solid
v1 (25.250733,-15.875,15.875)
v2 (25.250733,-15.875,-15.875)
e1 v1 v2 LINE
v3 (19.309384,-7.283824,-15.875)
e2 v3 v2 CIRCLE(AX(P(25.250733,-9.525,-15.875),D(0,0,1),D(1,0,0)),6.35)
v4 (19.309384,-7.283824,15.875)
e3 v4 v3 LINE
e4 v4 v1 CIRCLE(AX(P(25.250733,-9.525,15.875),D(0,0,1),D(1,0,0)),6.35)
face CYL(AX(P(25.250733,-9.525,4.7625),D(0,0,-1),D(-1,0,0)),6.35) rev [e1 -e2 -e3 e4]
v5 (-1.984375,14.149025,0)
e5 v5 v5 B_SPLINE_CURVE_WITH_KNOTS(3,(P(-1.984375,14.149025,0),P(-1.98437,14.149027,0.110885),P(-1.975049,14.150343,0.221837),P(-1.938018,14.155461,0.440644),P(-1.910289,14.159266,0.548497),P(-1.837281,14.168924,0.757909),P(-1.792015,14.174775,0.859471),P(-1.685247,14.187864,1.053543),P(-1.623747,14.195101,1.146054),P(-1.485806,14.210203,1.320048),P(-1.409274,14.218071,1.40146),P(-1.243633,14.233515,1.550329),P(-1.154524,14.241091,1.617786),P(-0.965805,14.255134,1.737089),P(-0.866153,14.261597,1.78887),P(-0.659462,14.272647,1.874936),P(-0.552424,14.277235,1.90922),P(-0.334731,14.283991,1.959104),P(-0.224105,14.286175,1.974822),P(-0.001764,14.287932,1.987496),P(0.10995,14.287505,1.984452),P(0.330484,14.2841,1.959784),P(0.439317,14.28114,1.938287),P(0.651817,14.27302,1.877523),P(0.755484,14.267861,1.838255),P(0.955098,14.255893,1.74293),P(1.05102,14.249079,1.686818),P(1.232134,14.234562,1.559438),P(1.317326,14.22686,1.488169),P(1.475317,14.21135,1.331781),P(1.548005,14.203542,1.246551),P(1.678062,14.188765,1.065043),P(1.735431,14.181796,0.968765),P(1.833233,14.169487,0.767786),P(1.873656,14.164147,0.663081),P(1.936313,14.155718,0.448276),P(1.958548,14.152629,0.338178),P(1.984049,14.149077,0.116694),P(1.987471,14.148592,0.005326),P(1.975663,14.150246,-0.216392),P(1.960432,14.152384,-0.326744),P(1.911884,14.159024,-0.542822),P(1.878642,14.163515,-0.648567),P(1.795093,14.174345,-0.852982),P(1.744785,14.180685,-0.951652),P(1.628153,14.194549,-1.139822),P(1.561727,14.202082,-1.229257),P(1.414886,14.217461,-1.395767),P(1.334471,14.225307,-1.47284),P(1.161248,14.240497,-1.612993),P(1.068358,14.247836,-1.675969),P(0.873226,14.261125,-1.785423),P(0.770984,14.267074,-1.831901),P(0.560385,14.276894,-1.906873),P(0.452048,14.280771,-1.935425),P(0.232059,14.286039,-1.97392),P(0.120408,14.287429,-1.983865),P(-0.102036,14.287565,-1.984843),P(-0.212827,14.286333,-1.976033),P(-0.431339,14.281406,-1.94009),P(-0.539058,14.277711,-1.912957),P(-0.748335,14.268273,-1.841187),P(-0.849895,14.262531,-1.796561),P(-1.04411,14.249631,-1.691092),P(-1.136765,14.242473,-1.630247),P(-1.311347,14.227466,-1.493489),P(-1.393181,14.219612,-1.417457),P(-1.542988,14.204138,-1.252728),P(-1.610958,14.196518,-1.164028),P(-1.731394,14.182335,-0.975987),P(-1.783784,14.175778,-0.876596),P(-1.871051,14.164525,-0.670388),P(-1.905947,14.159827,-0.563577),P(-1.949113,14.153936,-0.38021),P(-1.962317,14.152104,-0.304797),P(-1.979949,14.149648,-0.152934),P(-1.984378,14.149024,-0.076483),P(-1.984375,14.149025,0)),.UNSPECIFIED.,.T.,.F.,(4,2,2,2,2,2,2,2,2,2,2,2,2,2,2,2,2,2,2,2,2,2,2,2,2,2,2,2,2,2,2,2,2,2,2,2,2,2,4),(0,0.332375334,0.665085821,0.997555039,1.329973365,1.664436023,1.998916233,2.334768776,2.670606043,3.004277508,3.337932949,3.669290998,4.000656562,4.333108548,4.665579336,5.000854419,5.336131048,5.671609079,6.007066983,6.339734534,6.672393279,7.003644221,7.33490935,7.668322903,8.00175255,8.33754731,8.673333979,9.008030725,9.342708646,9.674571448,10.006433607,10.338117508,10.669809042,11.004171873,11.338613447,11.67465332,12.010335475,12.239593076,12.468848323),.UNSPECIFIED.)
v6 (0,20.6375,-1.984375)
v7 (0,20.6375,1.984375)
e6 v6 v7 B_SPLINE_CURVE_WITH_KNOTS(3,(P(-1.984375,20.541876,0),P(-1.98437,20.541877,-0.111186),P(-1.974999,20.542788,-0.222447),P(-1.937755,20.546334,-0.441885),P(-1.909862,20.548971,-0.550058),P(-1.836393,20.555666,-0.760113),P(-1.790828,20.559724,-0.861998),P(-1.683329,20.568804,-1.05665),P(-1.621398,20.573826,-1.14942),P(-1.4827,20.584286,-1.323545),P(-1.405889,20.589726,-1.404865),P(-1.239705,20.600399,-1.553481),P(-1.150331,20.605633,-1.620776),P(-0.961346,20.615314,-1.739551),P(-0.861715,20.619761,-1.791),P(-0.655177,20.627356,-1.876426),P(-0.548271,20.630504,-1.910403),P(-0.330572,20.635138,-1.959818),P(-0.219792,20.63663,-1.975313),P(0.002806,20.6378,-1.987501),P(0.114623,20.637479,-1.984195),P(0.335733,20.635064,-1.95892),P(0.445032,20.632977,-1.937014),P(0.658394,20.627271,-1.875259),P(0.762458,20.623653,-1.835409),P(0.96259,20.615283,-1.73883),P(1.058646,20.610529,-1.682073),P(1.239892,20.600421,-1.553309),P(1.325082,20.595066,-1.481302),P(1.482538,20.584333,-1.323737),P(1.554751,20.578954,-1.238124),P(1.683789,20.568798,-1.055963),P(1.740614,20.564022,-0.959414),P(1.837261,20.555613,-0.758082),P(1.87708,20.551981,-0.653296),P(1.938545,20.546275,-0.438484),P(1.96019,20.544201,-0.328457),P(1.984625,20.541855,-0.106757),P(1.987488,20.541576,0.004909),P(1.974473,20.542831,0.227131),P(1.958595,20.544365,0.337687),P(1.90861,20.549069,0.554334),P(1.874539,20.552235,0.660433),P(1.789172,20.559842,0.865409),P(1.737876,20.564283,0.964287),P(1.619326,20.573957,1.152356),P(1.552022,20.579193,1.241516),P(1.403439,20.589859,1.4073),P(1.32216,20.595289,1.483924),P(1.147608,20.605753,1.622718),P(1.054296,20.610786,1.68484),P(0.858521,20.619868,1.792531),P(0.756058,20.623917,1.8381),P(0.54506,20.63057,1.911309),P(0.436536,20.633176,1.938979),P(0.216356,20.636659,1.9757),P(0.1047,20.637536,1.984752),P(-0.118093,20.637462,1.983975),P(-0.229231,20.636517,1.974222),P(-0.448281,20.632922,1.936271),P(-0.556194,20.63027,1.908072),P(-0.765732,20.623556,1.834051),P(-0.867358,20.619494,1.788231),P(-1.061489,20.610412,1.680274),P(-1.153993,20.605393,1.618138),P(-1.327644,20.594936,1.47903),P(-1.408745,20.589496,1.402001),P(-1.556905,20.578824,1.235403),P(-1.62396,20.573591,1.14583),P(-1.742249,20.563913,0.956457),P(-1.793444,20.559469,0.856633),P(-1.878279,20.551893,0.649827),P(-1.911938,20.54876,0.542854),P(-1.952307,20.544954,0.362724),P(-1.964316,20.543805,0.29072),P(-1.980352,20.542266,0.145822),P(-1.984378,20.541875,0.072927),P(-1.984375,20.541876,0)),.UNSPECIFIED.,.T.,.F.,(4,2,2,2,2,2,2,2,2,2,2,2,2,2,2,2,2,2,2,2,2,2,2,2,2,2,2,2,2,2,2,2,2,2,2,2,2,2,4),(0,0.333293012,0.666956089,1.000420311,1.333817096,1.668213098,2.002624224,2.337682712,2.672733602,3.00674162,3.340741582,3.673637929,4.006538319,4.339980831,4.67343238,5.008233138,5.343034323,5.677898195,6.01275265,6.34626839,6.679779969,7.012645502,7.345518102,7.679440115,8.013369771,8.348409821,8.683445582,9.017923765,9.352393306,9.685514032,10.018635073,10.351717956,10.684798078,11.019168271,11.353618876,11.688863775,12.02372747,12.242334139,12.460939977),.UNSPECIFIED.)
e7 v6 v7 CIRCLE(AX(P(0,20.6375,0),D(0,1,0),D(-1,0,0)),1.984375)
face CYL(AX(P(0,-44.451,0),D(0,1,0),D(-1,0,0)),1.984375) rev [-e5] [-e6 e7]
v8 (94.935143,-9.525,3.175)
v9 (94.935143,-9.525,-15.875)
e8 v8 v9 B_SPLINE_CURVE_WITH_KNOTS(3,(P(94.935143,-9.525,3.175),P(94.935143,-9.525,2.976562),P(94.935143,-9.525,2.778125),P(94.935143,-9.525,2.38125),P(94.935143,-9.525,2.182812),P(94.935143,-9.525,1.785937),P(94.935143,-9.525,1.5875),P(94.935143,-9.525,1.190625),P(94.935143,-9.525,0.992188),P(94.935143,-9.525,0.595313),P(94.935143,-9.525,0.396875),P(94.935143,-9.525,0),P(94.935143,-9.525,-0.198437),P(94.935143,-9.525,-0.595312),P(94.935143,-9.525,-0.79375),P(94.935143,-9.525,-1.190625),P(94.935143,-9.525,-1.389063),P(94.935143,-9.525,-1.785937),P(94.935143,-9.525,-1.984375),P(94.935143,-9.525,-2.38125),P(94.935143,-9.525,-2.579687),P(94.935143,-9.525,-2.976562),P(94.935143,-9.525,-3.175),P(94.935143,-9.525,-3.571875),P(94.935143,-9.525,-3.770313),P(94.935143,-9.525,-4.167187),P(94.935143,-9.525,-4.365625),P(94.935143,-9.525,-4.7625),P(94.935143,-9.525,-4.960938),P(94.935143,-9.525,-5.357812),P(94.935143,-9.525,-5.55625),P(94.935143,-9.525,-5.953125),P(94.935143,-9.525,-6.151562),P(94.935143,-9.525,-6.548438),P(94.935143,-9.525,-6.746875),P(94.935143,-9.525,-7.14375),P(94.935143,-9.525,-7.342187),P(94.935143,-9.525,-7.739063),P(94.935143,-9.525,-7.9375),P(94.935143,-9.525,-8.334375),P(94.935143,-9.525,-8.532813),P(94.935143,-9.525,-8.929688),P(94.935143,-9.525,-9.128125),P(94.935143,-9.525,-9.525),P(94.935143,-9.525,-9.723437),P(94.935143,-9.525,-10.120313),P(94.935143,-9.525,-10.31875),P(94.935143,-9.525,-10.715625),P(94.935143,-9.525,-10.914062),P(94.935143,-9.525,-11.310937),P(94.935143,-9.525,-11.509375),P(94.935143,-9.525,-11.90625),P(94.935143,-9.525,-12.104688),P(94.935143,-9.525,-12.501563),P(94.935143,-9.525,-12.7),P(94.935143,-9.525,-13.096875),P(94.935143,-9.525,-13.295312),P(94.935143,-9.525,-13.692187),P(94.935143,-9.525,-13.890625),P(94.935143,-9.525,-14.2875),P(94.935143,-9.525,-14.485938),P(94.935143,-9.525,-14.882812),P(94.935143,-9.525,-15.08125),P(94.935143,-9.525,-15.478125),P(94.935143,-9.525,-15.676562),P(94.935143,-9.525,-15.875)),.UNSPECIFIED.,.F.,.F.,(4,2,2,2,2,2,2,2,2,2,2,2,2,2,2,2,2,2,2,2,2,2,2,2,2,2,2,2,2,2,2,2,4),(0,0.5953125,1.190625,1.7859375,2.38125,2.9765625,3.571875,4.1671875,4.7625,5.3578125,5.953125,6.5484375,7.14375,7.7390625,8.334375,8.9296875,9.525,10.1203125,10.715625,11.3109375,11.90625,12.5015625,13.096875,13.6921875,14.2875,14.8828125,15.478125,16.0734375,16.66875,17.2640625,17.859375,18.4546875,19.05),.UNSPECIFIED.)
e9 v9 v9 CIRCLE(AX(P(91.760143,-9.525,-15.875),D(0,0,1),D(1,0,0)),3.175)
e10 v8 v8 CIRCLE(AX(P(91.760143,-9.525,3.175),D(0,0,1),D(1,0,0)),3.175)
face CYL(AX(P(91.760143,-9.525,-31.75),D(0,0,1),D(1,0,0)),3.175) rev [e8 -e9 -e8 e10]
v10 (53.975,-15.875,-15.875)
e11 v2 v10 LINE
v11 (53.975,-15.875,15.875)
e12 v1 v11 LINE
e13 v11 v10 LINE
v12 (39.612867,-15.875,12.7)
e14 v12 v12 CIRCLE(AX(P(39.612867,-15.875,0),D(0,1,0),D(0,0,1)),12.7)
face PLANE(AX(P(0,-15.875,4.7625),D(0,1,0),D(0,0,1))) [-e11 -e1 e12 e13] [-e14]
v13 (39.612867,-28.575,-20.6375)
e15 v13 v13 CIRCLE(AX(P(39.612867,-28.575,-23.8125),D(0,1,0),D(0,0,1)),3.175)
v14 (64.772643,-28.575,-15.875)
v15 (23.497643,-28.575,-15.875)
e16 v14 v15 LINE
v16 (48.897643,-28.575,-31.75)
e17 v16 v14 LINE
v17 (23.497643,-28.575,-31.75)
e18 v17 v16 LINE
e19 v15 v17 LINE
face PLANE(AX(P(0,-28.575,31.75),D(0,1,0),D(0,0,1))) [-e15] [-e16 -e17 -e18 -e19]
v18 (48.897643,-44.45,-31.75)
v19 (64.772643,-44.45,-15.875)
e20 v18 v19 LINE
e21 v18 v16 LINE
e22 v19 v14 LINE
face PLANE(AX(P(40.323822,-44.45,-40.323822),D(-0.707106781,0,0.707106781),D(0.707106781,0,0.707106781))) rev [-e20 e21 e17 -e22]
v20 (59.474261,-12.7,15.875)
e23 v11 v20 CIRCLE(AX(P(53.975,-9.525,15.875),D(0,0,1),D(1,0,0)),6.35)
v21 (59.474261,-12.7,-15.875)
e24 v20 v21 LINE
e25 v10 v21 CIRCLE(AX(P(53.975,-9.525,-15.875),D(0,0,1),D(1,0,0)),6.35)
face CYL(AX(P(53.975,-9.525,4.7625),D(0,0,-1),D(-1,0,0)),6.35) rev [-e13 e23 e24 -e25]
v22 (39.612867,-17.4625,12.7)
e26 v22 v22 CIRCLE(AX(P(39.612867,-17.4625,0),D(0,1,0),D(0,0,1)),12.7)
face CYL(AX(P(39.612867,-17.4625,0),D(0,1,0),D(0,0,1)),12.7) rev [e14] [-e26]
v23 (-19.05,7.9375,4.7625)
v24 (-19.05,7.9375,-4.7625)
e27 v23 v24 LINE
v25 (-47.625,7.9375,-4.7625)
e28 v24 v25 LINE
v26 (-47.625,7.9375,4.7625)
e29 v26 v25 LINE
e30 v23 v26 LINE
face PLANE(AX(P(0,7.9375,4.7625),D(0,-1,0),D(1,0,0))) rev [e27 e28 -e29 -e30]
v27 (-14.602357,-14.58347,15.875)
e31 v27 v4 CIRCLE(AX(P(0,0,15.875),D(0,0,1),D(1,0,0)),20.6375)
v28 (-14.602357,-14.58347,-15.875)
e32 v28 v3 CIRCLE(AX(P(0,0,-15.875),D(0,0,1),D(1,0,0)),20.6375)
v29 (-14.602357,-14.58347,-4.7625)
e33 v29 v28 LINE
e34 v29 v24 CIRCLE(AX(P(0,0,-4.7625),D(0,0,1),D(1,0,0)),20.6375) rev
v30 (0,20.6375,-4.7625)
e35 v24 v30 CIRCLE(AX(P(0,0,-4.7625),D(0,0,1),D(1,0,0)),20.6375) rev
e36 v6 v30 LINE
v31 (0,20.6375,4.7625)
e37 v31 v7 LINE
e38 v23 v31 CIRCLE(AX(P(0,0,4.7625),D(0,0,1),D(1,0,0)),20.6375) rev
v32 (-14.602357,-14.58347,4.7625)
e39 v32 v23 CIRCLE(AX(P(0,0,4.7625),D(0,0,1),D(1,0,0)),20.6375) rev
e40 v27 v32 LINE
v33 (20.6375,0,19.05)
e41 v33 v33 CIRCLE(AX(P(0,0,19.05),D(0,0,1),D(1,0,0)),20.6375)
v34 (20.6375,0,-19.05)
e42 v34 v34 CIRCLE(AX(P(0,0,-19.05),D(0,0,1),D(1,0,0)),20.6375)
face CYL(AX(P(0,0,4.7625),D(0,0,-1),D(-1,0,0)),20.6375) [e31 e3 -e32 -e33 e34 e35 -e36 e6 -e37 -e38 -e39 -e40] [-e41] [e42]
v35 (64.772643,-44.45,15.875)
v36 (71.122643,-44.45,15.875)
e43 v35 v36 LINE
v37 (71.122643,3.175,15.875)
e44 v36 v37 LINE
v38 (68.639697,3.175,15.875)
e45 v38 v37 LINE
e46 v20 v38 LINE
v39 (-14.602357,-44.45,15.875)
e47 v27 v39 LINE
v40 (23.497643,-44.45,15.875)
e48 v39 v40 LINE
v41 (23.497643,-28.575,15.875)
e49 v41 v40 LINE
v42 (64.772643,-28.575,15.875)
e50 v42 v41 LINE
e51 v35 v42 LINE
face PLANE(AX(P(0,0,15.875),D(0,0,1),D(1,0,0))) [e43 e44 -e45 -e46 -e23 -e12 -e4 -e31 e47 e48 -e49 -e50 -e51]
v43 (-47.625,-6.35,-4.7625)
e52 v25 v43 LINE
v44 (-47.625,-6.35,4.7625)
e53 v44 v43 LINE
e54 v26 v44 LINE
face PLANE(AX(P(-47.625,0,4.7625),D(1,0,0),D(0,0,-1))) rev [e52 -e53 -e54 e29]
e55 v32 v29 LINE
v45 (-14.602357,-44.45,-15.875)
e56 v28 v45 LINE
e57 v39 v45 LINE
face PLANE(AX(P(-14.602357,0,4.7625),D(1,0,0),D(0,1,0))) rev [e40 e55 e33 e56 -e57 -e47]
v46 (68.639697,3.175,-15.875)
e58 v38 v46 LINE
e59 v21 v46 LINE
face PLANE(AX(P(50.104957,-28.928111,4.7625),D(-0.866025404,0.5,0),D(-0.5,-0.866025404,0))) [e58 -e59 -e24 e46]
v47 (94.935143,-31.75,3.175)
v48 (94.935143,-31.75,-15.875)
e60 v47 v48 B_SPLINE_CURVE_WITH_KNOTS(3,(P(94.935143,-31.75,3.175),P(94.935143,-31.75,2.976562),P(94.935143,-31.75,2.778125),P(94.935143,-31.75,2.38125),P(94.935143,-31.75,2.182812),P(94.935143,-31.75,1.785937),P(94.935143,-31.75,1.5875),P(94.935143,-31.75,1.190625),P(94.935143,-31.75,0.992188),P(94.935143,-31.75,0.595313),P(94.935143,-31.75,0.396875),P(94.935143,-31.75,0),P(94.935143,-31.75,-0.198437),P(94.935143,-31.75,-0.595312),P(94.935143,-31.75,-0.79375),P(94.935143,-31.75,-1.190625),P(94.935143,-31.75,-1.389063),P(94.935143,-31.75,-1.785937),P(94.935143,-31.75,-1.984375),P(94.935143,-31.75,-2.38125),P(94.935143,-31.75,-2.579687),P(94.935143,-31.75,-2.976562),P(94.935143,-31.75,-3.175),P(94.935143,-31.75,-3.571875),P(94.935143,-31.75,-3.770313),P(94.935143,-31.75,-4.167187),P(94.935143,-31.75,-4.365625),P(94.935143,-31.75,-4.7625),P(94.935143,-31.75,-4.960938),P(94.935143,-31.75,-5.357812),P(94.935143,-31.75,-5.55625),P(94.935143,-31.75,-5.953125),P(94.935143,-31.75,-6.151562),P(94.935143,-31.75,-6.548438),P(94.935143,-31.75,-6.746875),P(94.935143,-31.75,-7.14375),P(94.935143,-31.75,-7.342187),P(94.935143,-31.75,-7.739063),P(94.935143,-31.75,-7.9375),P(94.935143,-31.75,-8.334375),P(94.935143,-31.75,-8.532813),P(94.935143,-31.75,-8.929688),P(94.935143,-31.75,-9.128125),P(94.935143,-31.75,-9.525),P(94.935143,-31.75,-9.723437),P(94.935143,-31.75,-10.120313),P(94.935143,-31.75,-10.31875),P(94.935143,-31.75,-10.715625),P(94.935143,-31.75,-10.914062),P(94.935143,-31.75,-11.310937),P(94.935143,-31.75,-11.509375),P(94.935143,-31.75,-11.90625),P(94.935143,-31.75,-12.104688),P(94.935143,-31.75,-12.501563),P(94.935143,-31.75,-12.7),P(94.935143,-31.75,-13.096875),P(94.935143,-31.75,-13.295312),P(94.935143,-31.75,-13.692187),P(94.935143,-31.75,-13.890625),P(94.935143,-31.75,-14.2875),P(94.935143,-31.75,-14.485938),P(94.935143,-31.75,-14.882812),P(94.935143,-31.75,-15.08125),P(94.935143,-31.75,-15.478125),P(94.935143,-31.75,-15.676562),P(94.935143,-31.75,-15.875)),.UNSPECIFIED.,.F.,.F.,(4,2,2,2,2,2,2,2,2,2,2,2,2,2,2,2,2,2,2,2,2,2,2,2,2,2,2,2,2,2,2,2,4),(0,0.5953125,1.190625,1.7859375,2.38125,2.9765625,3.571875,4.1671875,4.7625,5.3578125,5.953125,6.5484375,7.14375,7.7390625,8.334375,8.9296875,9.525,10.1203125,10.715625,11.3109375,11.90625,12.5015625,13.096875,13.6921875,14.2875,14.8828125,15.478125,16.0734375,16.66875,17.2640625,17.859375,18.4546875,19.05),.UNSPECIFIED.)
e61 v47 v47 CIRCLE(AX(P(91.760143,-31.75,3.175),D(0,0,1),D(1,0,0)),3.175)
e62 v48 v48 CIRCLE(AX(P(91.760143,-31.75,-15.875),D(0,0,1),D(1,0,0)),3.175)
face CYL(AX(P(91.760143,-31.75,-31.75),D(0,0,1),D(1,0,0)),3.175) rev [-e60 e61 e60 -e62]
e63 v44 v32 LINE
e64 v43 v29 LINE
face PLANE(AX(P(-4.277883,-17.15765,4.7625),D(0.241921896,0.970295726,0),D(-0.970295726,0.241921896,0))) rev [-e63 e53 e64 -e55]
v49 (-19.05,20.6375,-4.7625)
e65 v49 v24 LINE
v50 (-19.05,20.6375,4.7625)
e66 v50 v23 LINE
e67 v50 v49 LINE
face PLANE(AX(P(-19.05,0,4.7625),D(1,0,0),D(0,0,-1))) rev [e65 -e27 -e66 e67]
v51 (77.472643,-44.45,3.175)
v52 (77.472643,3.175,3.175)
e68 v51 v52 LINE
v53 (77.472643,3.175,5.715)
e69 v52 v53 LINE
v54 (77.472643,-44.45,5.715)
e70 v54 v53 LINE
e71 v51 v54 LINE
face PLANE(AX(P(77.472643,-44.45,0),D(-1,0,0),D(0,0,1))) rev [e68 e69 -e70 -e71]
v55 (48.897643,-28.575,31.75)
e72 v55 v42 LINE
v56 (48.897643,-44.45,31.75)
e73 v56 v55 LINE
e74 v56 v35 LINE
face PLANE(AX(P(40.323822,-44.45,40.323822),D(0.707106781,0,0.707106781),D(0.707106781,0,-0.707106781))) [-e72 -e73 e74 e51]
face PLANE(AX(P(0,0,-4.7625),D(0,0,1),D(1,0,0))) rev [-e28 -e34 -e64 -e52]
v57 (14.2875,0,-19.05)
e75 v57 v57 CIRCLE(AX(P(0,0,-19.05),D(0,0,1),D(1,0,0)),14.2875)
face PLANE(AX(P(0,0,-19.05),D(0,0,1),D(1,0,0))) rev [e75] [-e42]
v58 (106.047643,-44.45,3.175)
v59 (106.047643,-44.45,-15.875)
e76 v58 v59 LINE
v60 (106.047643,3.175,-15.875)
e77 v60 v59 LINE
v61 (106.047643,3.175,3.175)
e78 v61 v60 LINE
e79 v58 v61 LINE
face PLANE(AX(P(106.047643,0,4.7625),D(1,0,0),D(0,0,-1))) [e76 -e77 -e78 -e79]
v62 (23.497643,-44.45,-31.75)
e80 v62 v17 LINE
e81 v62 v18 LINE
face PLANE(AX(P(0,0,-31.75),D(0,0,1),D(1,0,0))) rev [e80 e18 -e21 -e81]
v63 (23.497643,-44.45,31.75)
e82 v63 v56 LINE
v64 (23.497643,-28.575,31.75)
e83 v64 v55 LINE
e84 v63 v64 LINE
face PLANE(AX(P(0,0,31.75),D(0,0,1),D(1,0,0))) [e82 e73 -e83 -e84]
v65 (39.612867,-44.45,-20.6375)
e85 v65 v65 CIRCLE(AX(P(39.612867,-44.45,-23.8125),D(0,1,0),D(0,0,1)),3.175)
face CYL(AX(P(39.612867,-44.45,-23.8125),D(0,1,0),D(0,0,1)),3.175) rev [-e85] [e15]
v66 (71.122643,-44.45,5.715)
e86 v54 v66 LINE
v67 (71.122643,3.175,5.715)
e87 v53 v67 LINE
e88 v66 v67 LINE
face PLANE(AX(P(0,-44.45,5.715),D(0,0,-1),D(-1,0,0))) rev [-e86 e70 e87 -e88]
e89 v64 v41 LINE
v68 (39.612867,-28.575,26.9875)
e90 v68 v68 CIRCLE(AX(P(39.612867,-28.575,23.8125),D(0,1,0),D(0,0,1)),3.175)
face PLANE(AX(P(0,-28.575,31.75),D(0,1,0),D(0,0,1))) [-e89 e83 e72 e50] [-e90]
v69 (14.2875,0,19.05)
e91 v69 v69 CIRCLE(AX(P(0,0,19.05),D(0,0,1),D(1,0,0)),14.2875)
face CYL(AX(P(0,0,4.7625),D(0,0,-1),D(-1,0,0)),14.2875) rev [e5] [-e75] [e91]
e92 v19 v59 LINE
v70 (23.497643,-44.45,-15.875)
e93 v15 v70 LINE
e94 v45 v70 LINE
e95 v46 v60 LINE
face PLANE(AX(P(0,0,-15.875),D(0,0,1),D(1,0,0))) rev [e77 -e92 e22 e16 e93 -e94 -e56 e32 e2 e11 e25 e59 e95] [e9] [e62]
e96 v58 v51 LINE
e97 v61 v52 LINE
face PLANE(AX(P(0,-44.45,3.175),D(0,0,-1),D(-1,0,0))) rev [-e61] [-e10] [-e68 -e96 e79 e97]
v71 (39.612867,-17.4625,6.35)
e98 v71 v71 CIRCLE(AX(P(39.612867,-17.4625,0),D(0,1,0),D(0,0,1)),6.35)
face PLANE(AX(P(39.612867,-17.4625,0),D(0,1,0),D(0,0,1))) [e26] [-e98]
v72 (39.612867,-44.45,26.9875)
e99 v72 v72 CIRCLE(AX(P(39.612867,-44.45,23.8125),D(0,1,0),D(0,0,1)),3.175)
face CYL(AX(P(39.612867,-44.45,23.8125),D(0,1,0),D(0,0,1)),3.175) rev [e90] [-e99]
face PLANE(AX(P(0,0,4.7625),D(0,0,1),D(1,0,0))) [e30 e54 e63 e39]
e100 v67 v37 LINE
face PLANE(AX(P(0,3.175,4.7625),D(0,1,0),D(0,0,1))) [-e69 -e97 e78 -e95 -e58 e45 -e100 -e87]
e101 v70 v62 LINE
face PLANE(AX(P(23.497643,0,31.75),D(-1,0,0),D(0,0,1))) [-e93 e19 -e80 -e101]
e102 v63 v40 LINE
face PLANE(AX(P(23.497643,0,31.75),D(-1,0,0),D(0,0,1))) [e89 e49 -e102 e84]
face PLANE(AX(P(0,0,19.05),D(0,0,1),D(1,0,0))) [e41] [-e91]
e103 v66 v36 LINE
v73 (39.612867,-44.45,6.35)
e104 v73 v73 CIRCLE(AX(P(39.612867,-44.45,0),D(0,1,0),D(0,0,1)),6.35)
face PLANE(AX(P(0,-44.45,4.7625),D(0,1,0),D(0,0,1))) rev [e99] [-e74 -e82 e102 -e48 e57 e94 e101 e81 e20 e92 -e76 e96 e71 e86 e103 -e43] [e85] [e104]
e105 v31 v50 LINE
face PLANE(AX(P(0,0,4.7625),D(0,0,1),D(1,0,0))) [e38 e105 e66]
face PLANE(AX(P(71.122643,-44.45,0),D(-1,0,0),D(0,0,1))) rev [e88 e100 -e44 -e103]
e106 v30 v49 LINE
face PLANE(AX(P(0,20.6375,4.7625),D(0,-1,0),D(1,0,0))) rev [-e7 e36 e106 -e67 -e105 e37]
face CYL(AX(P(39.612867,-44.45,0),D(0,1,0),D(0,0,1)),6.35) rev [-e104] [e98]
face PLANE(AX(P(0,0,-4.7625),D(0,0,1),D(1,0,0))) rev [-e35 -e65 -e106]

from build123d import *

# Parameters (mm, degrees)
SKETCH1_R               = 20.6375
SKETCH1_R_2             = 14.2875
SKETCH1_W               = 41.275
SKETCH1_H               = 15.875
BOSS_EXTRUDE1_DEPTH     = 4.7625
SKETCH1_5_R             = 20.6375
SKETCH1_5_R_2           = 14.2875
BOSS_EXTRUDE2_DEPTH     = 19.05
SKETCH1_6_W             = 41.275
SKETCH1_6_H             = 15.875
BOSS_EXTRUDE3_DEPTH     = 15.875
SKETCH1_7_W             = 41.275
SKETCH1_7_H             = 15.875
BOSS_EXTRUDE4_DEPTH     = 31.75
CUT_EXTRUDE1_START      = -28.575
CUT_EXTRUDE1_OUTLINE_R  = 6.35
CUT_EXTRUDE1_DEPTH      = 47.625
CUT_EXTRUDE4_START      = -1.5875
SKETCH2_5_R             = 12.7
SKETCH2_5_R_2           = 6.35
CUT_EXTRUDE4_DEPTH      = 1.5875
CUT_EXTRUDE5_DEPTH      = 122.144687625
CUT_EXTRUDE5_DEPTH_BACK = 122.144687625
SKETCH3_R               = 3.175
SKETCH4_R               = 3.175
CUT_EXTRUDE6_DEPTH      = 121.173461332
CUT_EXTRUDE7_REACH      = 130.416
CUT_EXTRUDE7_END_RADIUS = 14.2875
SKETCH5_R               = 1.984375


# Read off the part's stored shape, not the designer's step: Cut-Extrude1
with BuildPart() as part:
    # Sketch1 → Boss-Extrude1 (new, symmetric)
    # profile 1 of 5: a face of its own
    with BuildSketch(Plane.XY):
        with BuildLine():
            ThreePointArc((25.250733281, -15.875), (20.027995944, -13.136857515), (19.309384274, -7.283823529))
            ThreePointArc((19.309384274, -7.283823529), (4.342837348, -20.175385251), (-14.60235654, -14.583469742))
            Line((-14.60235654, -14.583469742), (-14.60235654, -44.45))
            Line((-14.60235654, -44.45), (23.49764346, -44.45))
            Line((23.49764346, -44.45), (23.49764346, -28.575))
            Line((23.49764346, -28.575), (64.77264346, -28.575))
            Line((64.77264346, -28.575), (64.77264346, -44.45))
            Line((64.77264346, -44.45), (106.04764346, -44.45))
            Line((106.04764346, -44.45), (106.04764346, 3.175))
            Line((106.04764346, 3.175), (68.639696837, 3.175))
            Line((68.639696837, 3.175), (59.474261314, -12.7))
            ThreePointArc((59.474261314, -12.7), (57.15, -15.024261314), (53.975, -15.875))
            Line((53.975, -15.875), (25.250733281, -15.875))
        make_face()
    # profile 2 of 5: a face of its own
    with BuildSketch(Plane.XY):
        Circle(SKETCH1_R)
        with Locations(Location((0, 0, 0), (0, 0, 180))):
            Circle(SKETCH1_R_2, mode=Mode.SUBTRACT)
    # profile 3 of 5: a face of its own
    with BuildSketch(Plane.XY):
        with BuildLine():
            ThreePointArc((-14.60235654, -14.583469742), (-20.24645141, -3.998451143), (-19.05, 7.9375))
            Line((-19.05, 7.9375), (-47.625, 7.9375))
            Line((-47.625, 7.9375), (-47.625, -6.35))
            Line((-47.625, -6.35), (-14.60235654, -14.583469742))
        make_face()
    # profile 4 of 5: a face of its own
    with BuildSketch(Plane.XY):
        with Locations((44.13514346, -36.5125)):
            Rectangle(SKETCH1_W, SKETCH1_H)
    # profile 5 of 5: a face of its own
    with BuildSketch(Plane.XY):
        with BuildLine():
            ThreePointArc((-19.05, 7.9375), (-11.4476253, 17.171437949), (0, 20.6375))
            Line((0, 20.6375), (-19.05, 20.6375))
            Line((-19.05, 20.6375), (-19.05, 7.9375))
        make_face()
    extrude(amount=BOSS_EXTRUDE1_DEPTH, both=True)

    # Sketch1<5> → Boss-Extrude2 (add, symmetric)
    with BuildSketch(Plane.XY):
        Circle(SKETCH1_5_R)
        with Locations(Location((0, 0, 0), (0, 0, 180))):
            Circle(SKETCH1_5_R_2, mode=Mode.SUBTRACT)
    extrude(amount=BOSS_EXTRUDE2_DEPTH, both=True)

    # Sketch1<6> → Boss-Extrude3 (add, symmetric)
    with BuildSketch(Plane.XY):
        with BuildLine():
            ThreePointArc((25.250733281, -15.875), (20.027995944, -13.136857515), (19.309384274, -7.283823529))
            ThreePointArc((19.309384274, -7.283823529), (4.342837348, -20.175385251), (-14.60235654, -14.583469742))
            Line((-14.60235654, -14.583469742), (-14.60235654, -44.45))
            Line((-14.60235654, -44.45), (23.49764346, -44.45))
            Line((23.49764346, -44.45), (23.49764346, -28.575))
            Line((23.49764346, -28.575), (64.77264346, -28.575))
            Line((64.77264346, -28.575), (64.77264346, -44.45))
            Line((64.77264346, -44.45), (106.04764346, -44.45))
            Line((106.04764346, -44.45), (106.04764346, 3.175))
            Line((106.04764346, 3.175), (68.639696837, 3.175))
            Line((68.639696837, 3.175), (59.474261314, -12.7))
            ThreePointArc((59.474261314, -12.7), (57.15, -15.024261314), (53.975, -15.875))
            Line((53.975, -15.875), (25.250733281, -15.875))
        make_face()
        with Locations((44.13514346, -36.5125)):
            Rectangle(SKETCH1_6_W, SKETCH1_6_H)
    extrude(amount=BOSS_EXTRUDE3_DEPTH, both=True)

    # Sketch1<7> → Boss-Extrude4 (add, symmetric)
    with BuildSketch(Plane.XY):
        with Locations((44.13514346, -36.5125)):
            Rectangle(SKETCH1_7_W, SKETCH1_7_H)
    extrude(amount=BOSS_EXTRUDE4_DEPTH, both=True)

    # Cut-Extrude1 outline → Cut-Extrude1 (cut)
    with BuildSketch(Plane(origin=(0, -15.875, 0), x_dir=(1, 0, 0), z_dir=(0, 1, 0)).offset(CUT_EXTRUDE1_START)):
        with Locations((39.612866641, 0)):
            Circle(CUT_EXTRUDE1_OUTLINE_R)
        Polygon((71.12264346, -5.715), (71.12264346, -15.875), (106.04764346, -15.875), (106.04764346, -3.175), (77.47264346, -3.175), (77.47264346, -5.715), align=None)
        Polygon((64.77264346, -15.875), (48.89764346, -31.75), (64.77264346, -31.75), align=None)
        Polygon((64.77264346, 31.75), (48.89764346, 31.75), (64.77264346, 15.875), align=None)
    extrude(amount=CUT_EXTRUDE1_DEPTH, mode=Mode.SUBTRACT)

    # Sketch2<5> → Cut-Extrude4 (cut)
    # profile 1 of 4: a face of its own
    with BuildSketch(Plane(origin=(0, -15.875, 0), x_dir=(1, 0, 0), z_dir=(0, 1, 0)).offset(CUT_EXTRUDE4_START)):
        with Locations(Location((39.612866641, 0, 0), (0, 0, 270))):
            Circle(SKETCH2_5_R)
        with Locations(Location((39.612866641, 0, 0), (0, 0, 270))):
            Circle(SKETCH2_5_R_2, mode=Mode.SUBTRACT)
    # profile 2 of 4: a face of its own
    with BuildSketch(Plane(origin=(0, -15.875, 0), x_dir=(1, 0, 0), z_dir=(0, 1, 0)).offset(CUT_EXTRUDE4_START)):
        Polygon((48.89764346, -31.75), (64.77264346, -15.875), (64.77264346, -31.75), align=None)
    # profile 3 of 4: a face of its own
    with BuildSketch(Plane(origin=(0, -15.875, 0), x_dir=(1, 0, 0), z_dir=(0, 1, 0)).offset(CUT_EXTRUDE4_START)):
        Polygon((64.77264346, 31.75), (48.89764346, 31.75), (64.77264346, 15.875), align=None)
    # profile 4 of 4: a face of its own
    with BuildSketch(Plane(origin=(0, -15.875, 0), x_dir=(1, 0, 0), z_dir=(0, 1, 0)).offset(CUT_EXTRUDE4_START)):
        Polygon((106.04764346, -3.175), (77.47264346, -3.175), (77.47264346, -5.715), (71.12264346, -5.715), (71.12264346, -15.875), (106.04764346, -15.875), align=None)
    extrude(amount=CUT_EXTRUDE4_DEPTH, mode=Mode.SUBTRACT)

    # Sketch3 → Cut-Extrude5 (cut, two sides: drawn at the far end of the back side and taken through both)
    with BuildSketch(Plane(origin=(0, -28.575, 0), x_dir=(1, 0, 0), z_dir=(0, 1, 0)).offset(-CUT_EXTRUDE5_DEPTH_BACK)):
        with Locations(Location((39.612866641, 23.8125, 0), (0, 0, 270))):
            Circle(SKETCH3_R)
        with Locations(Location((39.612866641, -23.8125, 0), (0, 0, 270))):
            Circle(SKETCH3_R)
    extrude(amount=CUT_EXTRUDE5_DEPTH + CUT_EXTRUDE5_DEPTH_BACK, mode=Mode.SUBTRACT)

    # Sketch4 → Cut-Extrude6 (cut, through all)
    with BuildSketch(Plane.XY.offset(3.175)):
        with Locations((91.76014346, -9.525)):
            Circle(SKETCH4_R)
        with Locations((91.76014346, -31.75)):
            Circle(SKETCH4_R)
    extrude(amount=-CUT_EXTRUDE6_DEPTH, mode=Mode.SUBTRACT)

    # Cut-Extrude7: up to this cylinder (the profile starts outside it)
    cut_extrude7_end = Plane(origin=(0, 0, 0), z_dir=(0, 0, -1)) * Cylinder(CUT_EXTRUDE7_END_RADIUS, 290.407, mode=Mode.PRIVATE)
    # Sketch5 → Cut-Extrude7 (cut, up to the surface)
    with BuildSketch(Plane(origin=(0, 20.6375, 0), x_dir=(1, 0, 0), z_dir=(0, 1, 0)), mode=Mode.PRIVATE) as cut_extrude7_sk1:
        with Locations(Location((0, 0, 0), (0, 0, 180))):
            Circle(SKETCH5_R)
    cut_extrude7_tool1 = extrude(cut_extrude7_sk1.sketch, amount=-CUT_EXTRUDE7_REACH, mode=Mode.PRIVATE) - cut_extrude7_end
    add(cut_extrude7_tool1.solids().sort_by_distance((0, 20.6375, 0))[0], mode=Mode.SUBTRACT)


solid = part.part
